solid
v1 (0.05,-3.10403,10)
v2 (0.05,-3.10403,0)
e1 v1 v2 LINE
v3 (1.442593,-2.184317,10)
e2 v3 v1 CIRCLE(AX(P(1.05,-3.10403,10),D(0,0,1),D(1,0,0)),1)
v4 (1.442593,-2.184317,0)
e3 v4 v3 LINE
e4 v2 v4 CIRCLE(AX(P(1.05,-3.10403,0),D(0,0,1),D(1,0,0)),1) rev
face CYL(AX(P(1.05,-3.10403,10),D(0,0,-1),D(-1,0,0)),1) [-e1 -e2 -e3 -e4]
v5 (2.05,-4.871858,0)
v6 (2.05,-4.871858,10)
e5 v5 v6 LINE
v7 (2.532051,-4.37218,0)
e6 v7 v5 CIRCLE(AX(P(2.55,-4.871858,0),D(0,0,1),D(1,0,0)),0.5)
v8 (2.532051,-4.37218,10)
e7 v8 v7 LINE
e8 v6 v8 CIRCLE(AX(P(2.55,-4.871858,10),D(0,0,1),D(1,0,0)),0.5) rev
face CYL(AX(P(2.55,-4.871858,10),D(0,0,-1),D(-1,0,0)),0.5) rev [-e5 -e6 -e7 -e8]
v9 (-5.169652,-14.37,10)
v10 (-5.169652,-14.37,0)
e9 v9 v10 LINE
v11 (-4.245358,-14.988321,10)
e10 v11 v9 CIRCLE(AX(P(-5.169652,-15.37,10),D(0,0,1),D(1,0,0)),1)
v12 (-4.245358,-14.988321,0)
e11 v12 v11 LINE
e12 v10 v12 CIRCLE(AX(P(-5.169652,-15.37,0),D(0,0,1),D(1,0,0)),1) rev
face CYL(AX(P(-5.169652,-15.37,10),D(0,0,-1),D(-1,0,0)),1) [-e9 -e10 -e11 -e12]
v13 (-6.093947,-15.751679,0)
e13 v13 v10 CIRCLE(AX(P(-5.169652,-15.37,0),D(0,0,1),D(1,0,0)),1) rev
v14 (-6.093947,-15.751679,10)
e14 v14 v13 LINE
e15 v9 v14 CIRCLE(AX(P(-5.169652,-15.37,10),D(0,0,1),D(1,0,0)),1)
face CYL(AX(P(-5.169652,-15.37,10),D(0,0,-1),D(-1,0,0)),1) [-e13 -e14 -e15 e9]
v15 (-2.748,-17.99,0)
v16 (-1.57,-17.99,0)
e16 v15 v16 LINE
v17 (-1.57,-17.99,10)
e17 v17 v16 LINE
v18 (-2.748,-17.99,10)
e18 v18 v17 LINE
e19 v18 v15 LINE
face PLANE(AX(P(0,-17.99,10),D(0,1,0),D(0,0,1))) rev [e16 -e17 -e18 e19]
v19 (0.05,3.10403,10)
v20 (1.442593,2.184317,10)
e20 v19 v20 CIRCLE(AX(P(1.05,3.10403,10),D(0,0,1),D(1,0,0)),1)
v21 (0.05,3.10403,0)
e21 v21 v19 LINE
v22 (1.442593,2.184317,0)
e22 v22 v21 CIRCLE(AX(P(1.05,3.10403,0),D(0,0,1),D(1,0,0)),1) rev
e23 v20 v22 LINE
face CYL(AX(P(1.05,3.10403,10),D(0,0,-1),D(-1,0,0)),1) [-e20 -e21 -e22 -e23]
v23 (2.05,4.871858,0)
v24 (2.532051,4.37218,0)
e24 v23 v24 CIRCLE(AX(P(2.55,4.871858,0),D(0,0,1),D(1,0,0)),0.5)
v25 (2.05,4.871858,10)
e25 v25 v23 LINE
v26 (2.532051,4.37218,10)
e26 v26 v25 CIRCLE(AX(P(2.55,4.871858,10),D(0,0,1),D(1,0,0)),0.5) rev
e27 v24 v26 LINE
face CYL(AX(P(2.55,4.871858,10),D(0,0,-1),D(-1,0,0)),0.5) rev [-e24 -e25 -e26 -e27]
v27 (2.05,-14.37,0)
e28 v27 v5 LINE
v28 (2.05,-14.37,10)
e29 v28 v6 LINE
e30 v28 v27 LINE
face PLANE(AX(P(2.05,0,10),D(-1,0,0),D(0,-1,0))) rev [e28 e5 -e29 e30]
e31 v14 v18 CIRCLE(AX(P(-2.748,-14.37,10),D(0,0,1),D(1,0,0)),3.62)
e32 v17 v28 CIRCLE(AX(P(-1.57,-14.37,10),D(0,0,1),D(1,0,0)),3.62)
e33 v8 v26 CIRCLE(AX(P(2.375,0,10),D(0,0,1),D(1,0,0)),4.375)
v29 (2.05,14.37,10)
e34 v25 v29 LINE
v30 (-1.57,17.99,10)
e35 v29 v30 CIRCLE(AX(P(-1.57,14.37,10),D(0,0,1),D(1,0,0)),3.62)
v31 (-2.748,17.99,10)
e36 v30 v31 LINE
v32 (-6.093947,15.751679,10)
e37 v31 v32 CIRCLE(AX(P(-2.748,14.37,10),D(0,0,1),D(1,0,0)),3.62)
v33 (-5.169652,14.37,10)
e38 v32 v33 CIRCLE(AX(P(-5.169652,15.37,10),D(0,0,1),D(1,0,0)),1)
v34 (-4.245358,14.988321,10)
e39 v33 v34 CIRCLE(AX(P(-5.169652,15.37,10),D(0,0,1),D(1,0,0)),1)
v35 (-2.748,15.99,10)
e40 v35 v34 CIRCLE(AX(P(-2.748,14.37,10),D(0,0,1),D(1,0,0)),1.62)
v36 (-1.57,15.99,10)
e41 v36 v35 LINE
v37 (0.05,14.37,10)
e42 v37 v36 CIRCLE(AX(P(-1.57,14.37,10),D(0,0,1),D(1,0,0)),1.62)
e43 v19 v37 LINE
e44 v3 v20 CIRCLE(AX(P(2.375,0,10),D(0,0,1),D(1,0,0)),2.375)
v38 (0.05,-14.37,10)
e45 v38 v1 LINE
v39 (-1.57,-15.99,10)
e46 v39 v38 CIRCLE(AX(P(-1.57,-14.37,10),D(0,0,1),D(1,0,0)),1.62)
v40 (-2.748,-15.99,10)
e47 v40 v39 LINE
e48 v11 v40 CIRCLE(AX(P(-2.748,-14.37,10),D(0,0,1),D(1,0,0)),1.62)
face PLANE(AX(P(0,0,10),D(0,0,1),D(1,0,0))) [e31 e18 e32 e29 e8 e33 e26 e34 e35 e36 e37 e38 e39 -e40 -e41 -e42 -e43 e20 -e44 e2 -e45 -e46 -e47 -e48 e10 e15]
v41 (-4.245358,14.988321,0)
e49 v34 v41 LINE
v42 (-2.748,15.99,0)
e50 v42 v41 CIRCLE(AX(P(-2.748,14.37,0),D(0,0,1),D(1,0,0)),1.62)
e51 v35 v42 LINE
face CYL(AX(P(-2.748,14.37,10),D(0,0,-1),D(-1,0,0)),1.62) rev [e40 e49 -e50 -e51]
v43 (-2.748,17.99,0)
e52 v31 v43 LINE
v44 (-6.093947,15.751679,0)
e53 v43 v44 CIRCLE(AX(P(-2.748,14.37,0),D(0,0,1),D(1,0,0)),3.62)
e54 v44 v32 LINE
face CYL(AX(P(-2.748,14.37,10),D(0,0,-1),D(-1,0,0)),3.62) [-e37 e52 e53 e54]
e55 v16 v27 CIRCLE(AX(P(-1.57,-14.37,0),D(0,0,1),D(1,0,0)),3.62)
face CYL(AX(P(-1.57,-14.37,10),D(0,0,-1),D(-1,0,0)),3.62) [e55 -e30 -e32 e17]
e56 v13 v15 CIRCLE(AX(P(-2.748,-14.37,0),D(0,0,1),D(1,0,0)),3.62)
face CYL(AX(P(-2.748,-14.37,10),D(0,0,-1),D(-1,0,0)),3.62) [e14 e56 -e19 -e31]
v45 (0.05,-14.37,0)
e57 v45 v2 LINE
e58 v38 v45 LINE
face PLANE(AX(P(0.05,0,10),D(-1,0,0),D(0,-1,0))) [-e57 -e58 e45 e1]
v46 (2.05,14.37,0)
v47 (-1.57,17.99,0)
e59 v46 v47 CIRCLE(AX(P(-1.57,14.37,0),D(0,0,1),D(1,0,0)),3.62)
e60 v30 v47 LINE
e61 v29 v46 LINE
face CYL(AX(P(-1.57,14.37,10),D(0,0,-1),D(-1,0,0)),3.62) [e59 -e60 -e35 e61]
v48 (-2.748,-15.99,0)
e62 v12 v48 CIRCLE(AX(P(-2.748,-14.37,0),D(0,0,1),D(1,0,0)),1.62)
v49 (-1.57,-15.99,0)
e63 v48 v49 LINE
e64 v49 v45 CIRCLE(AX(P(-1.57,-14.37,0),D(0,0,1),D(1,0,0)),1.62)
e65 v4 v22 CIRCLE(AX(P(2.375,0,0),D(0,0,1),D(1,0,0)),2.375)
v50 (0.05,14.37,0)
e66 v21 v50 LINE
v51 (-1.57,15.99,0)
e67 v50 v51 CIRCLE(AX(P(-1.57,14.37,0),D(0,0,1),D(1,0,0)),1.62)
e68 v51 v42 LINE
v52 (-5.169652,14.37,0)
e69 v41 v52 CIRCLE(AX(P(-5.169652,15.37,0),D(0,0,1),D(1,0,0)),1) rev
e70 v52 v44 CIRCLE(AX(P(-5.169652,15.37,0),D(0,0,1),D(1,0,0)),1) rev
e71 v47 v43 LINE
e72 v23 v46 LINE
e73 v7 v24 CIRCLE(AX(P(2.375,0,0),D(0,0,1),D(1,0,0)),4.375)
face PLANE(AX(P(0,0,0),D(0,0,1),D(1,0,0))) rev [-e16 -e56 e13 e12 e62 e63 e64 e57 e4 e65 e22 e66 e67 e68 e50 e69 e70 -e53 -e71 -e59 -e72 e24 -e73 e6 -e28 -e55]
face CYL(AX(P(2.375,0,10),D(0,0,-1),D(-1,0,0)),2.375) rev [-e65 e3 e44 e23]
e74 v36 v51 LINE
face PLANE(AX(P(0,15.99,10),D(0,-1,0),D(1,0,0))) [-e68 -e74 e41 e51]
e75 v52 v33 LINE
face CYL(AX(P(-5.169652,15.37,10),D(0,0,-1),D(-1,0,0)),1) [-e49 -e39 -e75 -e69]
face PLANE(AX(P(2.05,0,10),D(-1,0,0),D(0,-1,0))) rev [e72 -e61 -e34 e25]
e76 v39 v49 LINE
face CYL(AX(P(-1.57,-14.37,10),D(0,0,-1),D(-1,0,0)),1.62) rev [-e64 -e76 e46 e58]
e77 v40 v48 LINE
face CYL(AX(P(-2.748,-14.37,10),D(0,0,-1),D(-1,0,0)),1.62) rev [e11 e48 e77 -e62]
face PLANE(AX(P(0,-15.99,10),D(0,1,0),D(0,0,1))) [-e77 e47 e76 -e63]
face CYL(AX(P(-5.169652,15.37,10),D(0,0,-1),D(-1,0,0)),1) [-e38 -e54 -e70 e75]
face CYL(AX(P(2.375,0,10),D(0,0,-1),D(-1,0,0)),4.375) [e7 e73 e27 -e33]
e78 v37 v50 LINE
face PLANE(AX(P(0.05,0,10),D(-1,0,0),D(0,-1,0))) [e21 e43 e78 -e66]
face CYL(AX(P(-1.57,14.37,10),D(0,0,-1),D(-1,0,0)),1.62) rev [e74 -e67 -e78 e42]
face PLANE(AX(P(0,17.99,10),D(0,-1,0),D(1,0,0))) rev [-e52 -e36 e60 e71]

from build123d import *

# Parameters (mm, degrees)
BOSS_EXTRUDE1_DEPTH = 10
FILLET1_R           = 1
FILLET2_R           = 0.5
FILLET3_R           = 1


with BuildPart() as part:
    # Sketch1 → Boss-Extrude1 (new body)
    with BuildSketch(Plane.XY):
        with BuildLine():
            Line((0.05, 14.37), (0.05, 3.706076092))
            ThreePointArc((0.05, 3.706076092), (1.009905384, 4.156578123), (2.05, 4.362911872))
            Line((2.05, 4.362911872), (2.05, 14.37))
            ThreePointArc((2.05, 14.37), (0.989726548, 16.929726548), (-1.57, 17.99))
            Line((-1.57, 17.99), (-2.748, 17.99))
            ThreePointArc((-2.748, 17.99), (-5.307726548, 16.929726548), (-6.368, 14.37))
            Line((-6.368, 14.37), (-4.368, 14.37))
            ThreePointArc((-4.368, 14.37), (-3.893512986, 15.515512986), (-2.748, 15.99))
            Line((-2.748, 15.99), (-1.57, 15.99))
            ThreePointArc((-1.57, 15.99), (-0.424487014, 15.515512986), (0.05, 14.37))
        make_face()
        with BuildLine():
            Line((0.05, -0.484767986), (0.05, -3.706076092))
            ThreePointArc((0.05, -3.706076092), (1.009905384, -4.156578123), (2.05, -4.362911872))
            Line((2.05, -4.362911872), (2.05, -2.352658071))
            ThreePointArc((2.05, -2.352658071), (0.753926793, -1.73572655), (0.05, -0.484767986))
        make_face()
        with BuildLine():
            ThreePointArc((2.05, 4.362911872), (1.009905384, 4.156578123), (0.05, 3.706076092))
            Line((0.05, 3.706076092), (0.05, 0.484767986))
            ThreePointArc((0.05, 0.484767986), (0.753926793, 1.73572655), (2.05, 2.352658071))
            Line((2.05, 2.352658071), (2.05, 4.362911872))
        make_face()
        with BuildLine():
            Line((2.05, -2.352658071), (2.05, -4.362911872))
            ThreePointArc((2.05, -4.362911872), (5.351470225, -3.206438835), (6.75, 0))
            ThreePointArc((6.75, 0), (5.351470225, 3.206438835), (2.05, 4.362911872))
            Line((2.05, 4.362911872), (2.05, 2.352658071))
            ThreePointArc((2.05, 2.352658071), (3.935248378, 1.790600458), (4.75, 0))
            ThreePointArc((4.75, 0), (3.935248378, -1.790600458), (2.05, -2.352658071))
        make_face()
        with BuildLine():
            Line((-1.57, -15.99), (-2.748, -15.99))
            ThreePointArc((-2.748, -15.99), (-3.893512986, -15.515512986), (-4.368, -14.37))
            Line((-4.368, -14.37), (-6.368, -14.37))
            ThreePointArc((-6.368, -14.37), (-5.307726548, -16.929726548), (-2.748, -17.99))
            Line((-2.748, -17.99), (-1.57, -17.99))
            ThreePointArc((-1.57, -17.99), (0.989726548, -16.929726548), (2.05, -14.37))
            Line((2.05, -14.37), (2.05, -4.362911872))
            ThreePointArc((2.05, -4.362911872), (1.009905384, -4.156578123), (0.05, -3.706076092))
            Line((0.05, -3.706076092), (0.05, -14.37))
            ThreePointArc((0.05, -14.37), (-0.424487014, -15.515512986), (-1.57, -15.99))
        make_face()
    extrude(amount=BOSS_EXTRUDE1_DEPTH)

    # Fillet1
    fillet1_edges = [part.edges().sort_by_distance(p)[0] for p in [
        (0.05, -0.484767986, 5),
        (0.05, 0.484767986, 5),
    ]]
    fillet(fillet1_edges, radius=FILLET1_R)

    # Fillet2
    fillet2_edges = [part.edges().sort_by_distance(p)[0] for p in [
        (2.05, 4.362911872, 5),
        (2.05, -4.362911872, 5),
    ]]
    fillet(fillet2_edges, radius=FILLET2_R)

    # Fillet3
    fillet3_edges = [part.edges().sort_by_distance(p)[0] for p in [
        (-6.368, 14.37, 5),
        (-4.368, 14.37, 5),
        (-6.368, -14.37, 5),
        (-4.368, -14.37, 5),
    ]]
    fillet(fillet3_edges, radius=FILLET3_R - 0.0001)  # a hair under: the kernel refuses the full size


solid = part.part
